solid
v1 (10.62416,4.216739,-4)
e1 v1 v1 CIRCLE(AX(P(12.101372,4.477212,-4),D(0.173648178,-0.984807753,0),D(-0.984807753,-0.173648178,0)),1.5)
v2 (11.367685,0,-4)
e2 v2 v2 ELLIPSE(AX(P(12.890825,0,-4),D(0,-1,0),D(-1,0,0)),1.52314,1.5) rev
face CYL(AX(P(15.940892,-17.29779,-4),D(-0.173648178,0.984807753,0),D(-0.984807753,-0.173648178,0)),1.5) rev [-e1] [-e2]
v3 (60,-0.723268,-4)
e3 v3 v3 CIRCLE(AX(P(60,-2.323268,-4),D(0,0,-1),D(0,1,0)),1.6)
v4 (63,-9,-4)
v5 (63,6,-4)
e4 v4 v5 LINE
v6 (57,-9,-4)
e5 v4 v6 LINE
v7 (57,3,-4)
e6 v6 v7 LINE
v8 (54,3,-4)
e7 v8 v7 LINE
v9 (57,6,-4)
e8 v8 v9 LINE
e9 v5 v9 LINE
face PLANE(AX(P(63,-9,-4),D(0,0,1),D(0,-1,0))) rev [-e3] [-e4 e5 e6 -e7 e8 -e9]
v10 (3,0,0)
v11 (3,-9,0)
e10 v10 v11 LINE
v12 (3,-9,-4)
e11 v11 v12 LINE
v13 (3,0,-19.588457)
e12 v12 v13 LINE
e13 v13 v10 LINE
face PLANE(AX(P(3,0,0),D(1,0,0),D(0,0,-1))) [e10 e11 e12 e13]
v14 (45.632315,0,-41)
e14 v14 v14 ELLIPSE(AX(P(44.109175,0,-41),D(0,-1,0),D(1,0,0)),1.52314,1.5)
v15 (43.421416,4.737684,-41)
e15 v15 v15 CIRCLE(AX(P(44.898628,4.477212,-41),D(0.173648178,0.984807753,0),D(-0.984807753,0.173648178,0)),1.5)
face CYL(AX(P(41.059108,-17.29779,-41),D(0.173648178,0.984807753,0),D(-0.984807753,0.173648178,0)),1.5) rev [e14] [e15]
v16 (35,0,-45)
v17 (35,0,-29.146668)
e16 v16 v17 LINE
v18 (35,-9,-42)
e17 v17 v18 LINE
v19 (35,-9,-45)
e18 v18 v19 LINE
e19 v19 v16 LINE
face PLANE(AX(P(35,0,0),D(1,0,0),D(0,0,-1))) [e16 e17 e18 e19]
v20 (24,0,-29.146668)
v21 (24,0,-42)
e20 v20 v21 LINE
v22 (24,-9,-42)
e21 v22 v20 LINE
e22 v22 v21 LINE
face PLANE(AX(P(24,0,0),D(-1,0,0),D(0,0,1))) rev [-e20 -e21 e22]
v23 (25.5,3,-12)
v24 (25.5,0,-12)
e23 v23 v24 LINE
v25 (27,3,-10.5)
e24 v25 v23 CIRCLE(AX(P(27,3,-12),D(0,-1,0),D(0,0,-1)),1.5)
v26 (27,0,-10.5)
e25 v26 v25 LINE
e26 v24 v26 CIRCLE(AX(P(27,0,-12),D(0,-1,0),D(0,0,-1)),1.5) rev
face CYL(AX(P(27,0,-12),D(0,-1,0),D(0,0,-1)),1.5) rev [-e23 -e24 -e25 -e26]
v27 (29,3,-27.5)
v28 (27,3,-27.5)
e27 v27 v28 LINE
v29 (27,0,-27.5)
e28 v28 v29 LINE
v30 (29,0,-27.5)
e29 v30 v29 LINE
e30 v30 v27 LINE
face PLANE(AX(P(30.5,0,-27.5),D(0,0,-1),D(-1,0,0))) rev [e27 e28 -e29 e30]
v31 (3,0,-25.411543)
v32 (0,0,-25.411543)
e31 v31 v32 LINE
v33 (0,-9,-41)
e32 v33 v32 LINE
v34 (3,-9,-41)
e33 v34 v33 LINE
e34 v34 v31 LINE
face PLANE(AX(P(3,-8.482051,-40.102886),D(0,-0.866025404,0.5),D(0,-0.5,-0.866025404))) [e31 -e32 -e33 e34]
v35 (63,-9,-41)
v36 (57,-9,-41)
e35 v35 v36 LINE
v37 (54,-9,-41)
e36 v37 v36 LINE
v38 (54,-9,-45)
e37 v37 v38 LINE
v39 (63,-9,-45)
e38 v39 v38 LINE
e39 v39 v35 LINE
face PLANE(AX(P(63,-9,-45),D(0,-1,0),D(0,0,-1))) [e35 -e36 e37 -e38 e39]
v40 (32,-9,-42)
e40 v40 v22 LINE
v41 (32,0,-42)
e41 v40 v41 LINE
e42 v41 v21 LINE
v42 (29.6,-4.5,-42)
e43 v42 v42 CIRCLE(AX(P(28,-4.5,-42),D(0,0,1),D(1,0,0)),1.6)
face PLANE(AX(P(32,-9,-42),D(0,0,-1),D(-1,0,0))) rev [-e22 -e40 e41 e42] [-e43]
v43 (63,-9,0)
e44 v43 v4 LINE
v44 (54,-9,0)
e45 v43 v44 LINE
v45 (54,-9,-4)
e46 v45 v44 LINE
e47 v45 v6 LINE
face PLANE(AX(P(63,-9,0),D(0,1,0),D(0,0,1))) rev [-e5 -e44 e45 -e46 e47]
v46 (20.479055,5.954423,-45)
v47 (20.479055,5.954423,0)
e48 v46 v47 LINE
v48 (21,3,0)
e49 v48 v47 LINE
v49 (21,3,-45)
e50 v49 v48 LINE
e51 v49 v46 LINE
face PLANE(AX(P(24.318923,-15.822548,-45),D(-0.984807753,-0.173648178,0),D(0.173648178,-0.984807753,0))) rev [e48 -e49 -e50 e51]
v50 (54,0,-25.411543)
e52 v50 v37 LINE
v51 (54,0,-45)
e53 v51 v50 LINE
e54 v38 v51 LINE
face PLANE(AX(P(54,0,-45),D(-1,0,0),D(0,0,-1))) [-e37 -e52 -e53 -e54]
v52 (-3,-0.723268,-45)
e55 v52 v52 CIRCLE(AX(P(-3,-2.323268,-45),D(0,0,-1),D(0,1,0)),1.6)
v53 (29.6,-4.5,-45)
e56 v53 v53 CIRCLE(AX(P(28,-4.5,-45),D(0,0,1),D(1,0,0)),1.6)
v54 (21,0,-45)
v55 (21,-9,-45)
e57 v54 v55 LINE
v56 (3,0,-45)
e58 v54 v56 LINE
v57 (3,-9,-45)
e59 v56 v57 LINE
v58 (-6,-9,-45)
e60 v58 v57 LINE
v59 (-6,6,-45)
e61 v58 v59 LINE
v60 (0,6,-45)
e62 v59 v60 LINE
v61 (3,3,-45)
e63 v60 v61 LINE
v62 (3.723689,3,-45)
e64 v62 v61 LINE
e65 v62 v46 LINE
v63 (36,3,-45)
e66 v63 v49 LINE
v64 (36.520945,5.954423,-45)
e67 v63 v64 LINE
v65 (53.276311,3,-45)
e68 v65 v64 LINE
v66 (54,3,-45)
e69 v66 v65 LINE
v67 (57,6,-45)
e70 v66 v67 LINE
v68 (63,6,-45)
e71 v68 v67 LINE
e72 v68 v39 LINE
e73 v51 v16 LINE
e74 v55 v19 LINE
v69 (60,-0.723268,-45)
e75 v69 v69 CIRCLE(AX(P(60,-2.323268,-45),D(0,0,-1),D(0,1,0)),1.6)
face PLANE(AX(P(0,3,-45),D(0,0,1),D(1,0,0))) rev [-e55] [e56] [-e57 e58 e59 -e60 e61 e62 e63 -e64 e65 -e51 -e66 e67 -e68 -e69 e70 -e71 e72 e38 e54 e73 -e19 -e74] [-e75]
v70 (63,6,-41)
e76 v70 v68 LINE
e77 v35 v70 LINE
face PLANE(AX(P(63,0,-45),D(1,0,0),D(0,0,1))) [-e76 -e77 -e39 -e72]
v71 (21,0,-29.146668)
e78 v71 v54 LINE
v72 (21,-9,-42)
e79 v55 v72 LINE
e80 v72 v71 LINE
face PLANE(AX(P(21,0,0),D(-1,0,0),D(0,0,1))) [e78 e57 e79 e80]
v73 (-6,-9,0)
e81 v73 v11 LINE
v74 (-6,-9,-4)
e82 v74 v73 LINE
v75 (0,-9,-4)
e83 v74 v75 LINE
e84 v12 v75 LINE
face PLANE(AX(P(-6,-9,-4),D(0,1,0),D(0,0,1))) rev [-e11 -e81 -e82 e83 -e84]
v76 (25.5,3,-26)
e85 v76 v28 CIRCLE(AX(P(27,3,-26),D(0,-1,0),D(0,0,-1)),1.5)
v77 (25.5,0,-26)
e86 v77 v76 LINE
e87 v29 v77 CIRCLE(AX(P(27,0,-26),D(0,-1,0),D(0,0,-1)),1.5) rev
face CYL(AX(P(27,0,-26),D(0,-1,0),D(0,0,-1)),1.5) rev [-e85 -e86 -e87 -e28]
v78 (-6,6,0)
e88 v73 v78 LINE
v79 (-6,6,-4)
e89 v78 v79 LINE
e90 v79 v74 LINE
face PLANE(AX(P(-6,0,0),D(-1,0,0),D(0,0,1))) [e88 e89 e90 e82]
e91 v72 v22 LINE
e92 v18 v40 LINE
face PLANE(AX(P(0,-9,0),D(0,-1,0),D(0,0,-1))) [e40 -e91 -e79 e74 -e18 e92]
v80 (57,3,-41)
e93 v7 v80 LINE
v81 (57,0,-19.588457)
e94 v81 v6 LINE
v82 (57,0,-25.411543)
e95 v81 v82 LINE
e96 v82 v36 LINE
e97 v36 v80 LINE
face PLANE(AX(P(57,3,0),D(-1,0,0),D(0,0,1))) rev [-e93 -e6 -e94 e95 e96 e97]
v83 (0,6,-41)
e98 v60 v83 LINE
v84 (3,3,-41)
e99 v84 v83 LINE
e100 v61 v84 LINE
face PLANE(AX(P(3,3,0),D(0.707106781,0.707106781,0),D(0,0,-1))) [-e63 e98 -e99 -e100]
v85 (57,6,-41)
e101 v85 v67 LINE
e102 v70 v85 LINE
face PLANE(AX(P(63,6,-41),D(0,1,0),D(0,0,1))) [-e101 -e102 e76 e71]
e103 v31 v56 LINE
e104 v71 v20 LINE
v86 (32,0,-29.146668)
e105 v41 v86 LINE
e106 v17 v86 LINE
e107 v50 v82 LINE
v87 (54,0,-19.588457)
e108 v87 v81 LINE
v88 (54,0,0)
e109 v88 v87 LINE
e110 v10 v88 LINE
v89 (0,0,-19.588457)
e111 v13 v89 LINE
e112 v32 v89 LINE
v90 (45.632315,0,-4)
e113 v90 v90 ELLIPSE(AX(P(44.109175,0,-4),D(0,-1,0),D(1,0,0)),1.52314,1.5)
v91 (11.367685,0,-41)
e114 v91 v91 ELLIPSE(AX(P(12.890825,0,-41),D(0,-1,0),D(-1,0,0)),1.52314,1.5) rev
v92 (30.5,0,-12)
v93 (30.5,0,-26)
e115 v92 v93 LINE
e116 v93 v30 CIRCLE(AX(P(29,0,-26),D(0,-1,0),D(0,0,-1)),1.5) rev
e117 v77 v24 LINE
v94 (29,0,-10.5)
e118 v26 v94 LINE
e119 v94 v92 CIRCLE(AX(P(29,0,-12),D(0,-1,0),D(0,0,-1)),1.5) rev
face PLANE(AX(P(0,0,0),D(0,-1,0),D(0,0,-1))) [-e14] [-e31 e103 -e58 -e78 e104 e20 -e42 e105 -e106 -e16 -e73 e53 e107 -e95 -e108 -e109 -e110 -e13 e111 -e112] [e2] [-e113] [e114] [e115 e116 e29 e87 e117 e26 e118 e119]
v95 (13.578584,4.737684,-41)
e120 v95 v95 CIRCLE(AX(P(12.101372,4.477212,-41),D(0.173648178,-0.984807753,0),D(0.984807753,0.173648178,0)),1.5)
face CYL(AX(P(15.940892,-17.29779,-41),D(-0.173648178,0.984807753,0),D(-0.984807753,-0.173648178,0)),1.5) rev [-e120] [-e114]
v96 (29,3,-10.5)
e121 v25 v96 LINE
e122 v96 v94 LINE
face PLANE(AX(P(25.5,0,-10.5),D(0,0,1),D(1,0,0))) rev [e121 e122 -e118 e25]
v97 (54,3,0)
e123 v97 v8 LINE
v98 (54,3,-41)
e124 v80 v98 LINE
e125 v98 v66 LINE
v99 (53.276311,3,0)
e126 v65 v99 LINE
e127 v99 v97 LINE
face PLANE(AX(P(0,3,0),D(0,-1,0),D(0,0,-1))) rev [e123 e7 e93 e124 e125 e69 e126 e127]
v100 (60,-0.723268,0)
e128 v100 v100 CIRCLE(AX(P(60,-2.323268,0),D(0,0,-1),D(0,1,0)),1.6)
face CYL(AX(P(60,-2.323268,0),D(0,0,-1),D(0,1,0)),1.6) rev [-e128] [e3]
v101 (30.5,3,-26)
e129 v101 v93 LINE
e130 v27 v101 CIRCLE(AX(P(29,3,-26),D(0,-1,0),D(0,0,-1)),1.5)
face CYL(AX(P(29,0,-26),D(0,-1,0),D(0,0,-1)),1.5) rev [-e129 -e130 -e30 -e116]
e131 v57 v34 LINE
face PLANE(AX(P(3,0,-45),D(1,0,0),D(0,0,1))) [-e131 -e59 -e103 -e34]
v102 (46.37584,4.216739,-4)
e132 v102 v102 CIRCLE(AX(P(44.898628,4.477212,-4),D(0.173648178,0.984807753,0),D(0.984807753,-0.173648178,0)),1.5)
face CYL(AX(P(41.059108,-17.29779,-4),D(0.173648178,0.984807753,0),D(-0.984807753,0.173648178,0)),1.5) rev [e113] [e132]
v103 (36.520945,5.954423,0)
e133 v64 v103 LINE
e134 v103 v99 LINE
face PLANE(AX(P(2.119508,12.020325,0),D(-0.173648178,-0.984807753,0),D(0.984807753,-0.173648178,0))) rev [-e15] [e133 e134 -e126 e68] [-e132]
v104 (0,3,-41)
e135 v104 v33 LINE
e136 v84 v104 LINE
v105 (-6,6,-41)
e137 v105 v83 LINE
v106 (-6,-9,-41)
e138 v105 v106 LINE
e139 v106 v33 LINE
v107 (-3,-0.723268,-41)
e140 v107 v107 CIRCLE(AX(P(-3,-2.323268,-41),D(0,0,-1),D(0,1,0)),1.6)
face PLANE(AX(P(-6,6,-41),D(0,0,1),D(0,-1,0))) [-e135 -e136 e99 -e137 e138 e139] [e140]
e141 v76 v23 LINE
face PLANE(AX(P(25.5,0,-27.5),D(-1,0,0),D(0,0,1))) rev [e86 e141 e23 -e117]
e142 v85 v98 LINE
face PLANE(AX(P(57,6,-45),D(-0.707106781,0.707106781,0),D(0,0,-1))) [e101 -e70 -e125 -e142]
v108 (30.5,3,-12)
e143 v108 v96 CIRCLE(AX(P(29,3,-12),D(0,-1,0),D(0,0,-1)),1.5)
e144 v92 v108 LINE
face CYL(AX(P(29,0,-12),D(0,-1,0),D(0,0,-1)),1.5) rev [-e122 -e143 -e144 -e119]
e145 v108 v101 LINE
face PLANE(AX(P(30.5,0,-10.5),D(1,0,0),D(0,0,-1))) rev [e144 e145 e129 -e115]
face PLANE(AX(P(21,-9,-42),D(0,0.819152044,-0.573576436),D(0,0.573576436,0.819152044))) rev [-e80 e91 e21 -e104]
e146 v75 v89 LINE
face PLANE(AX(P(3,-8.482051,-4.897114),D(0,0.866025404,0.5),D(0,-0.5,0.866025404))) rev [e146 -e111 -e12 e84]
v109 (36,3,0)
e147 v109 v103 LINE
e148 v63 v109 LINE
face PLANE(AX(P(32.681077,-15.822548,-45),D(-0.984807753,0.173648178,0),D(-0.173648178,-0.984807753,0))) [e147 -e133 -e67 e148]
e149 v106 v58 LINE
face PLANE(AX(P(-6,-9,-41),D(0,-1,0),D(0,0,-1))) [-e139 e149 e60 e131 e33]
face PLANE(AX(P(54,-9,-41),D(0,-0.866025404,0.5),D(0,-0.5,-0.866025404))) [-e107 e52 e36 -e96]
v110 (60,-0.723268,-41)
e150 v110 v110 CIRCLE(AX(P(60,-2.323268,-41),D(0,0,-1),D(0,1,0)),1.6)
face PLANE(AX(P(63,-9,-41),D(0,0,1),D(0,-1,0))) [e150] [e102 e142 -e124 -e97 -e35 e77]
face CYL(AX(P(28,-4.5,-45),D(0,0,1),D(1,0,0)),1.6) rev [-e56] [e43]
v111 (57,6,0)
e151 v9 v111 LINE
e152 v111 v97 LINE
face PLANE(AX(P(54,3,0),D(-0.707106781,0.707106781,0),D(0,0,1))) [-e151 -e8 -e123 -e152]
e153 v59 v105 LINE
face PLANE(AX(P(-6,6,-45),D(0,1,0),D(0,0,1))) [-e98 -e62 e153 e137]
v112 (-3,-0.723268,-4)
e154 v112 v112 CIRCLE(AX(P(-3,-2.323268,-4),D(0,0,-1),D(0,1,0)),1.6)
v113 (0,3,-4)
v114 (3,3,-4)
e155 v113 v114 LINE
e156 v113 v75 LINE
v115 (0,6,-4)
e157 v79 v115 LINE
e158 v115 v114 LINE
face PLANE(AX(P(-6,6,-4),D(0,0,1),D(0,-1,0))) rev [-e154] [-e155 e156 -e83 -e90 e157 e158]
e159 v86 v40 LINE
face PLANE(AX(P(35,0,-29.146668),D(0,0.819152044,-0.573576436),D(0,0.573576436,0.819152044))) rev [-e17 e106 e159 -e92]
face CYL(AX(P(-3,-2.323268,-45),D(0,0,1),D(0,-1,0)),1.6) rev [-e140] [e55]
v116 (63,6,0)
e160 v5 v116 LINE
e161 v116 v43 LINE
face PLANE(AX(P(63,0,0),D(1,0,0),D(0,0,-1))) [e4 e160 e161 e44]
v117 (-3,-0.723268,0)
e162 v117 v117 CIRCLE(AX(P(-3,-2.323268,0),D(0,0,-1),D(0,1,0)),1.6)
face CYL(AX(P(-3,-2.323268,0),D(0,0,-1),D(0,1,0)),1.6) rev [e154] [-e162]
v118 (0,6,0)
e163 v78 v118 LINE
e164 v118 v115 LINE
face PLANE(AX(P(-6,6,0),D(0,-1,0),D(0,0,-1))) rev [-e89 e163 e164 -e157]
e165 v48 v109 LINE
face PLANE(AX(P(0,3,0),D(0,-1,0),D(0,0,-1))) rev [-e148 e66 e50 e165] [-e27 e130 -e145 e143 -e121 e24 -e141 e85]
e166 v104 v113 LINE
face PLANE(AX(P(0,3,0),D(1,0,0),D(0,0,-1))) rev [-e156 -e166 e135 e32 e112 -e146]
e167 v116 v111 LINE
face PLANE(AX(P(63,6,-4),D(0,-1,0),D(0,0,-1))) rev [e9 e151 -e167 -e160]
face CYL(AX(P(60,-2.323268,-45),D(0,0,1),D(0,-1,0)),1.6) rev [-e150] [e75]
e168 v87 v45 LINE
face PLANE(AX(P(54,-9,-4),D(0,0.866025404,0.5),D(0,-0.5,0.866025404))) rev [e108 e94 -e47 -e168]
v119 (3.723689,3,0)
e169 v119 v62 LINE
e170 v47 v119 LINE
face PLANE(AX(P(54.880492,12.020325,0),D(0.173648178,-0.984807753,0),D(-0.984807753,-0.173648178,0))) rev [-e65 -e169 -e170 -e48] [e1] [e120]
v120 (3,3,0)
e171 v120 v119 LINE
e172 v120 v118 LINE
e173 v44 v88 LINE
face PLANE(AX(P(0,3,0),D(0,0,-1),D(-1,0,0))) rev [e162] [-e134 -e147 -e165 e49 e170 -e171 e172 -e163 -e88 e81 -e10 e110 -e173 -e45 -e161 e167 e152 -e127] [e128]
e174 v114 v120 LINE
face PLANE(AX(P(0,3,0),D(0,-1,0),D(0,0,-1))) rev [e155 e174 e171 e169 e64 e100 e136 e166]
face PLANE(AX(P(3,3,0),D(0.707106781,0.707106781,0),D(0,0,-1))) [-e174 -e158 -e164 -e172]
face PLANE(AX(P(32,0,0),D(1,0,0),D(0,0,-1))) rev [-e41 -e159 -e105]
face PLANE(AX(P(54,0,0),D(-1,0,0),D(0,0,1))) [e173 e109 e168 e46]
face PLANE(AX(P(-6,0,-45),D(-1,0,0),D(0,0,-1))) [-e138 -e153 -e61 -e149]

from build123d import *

# Parameters (mm, degrees)
SKETCH_1_W                 = 57
SKETCH_1_H                 = 45
EXTRUDE_1_DEPTH            = 3
SKETCH_2_W                 = 4
SKETCH_2_H                 = 15
EXTRUDE_2_DEPTH            = 6
SKETCH_3_W                 = 4
SKETCH_3_H                 = 15
EXTRUDE_3_DEPTH            = 6
EXTRUDE_4_DEPTH            = 3
SKETCH_5_W                 = 4
SKETCH_5_H                 = 9
EXTRUDE_5_DEPTH            = 3
CHAMFER_1_SIZE             = 3
SKETCH_6_R                 = 1.6
CUT_EXTRUDE_1_DEPTH        = 4
SKETCH_8_W                 = 8
SKETCH_8_H                 = 3
EXTRUDE_6_DEPTH            = 9
EXTRUDE_7_DEPTH            = 3
EXTRUDE_8_DEPTH            = 3
SKETCH_11_R                = 1.6
CUT_EXTRUDE_3_DEPTH        = 3
SKETCH_12_W                = 5
SKETCH_12_H                = 17
CUT_EXTRUDE_4_DEPTH        = 3
FILLET_1_R                 = 1.5
EXTRUDE_9_REACH            = 80.57
SKETCH_15_W                = 45
SKETCH_15_H                = 17.726539555
SKETCH_16_R                = 1.5
CUT_EXTRUDE_5_DEPTH        = 79.570276896
CHAMFER_1_OF_MIRROR_2_SIZE = 3


with BuildPart() as part:
    # 草图1 → 凸台-拉伸1 (new body)
    with BuildSketch(Plane(origin=(0, 0, 0), x_dir=(1, 0, 0), z_dir=(0, 1, 0))):
        with Locations((28.5, 22.5)):
            Rectangle(SKETCH_1_W, SKETCH_1_H)
    extrude(amount=EXTRUDE_1_DEPTH)

    # 草图2 → 凸台-拉伸2 (add)
    with BuildSketch(Plane.ZY):
        with Locations((-2, -1.5)):
            Rectangle(SKETCH_2_W, SKETCH_2_H)
    extrude_2 = extrude(amount=EXTRUDE_2_DEPTH)

    # 草图3 → 凸台-拉伸3 (add)
    with BuildSketch(Plane(origin=(57, 0, 0), x_dir=(0, 0, -1), z_dir=(1, 0, 0))):
        with Locations((2, -1.5)):
            Rectangle(SKETCH_3_W, SKETCH_3_H)
    extrude_3 = extrude(amount=EXTRUDE_3_DEPTH)

    # 草图4 → 凸台-拉伸4 (add)
    with BuildSketch(Plane.ZY.offset(-57)):
        Polygon((-4, -9), (-19.588457268, 0), (0, 0), (0, -9), align=None)
    extrude_4 = extrude(amount=EXTRUDE_4_DEPTH)

    # 草图5 → 凸台-拉伸5 (add)
    with BuildSketch(Plane(origin=(0, 0, 0), x_dir=(0, 0, -1), z_dir=(1, 0, 0))):
        Polygon((19.588457268, 0), (4, 0), (4, -9), align=None)
        with Locations((2, -4.5)):
            Rectangle(SKETCH_5_W, SKETCH_5_H)
    extrude_5 = extrude(amount=EXTRUDE_5_DEPTH)

    # 倒角1
    chamfer_1_edges = [part.edges().sort_by_distance(p)[0] for p in [
        (0, 3, -2),
        (57, 3, -2),
    ]]
    chamfer(chamfer_1_edges, length=CHAMFER_1_SIZE - 0.0001)  # a hair under: the kernel refuses the full size

    # 草图6 → 切除-拉伸1 (cut)
    with BuildSketch(Plane(origin=(0, 0, -4), x_dir=(-1, 0, 0), z_dir=(0, 0, -1))):
        with Locations(Location((3, -2.323268139, 0), (0, 0, 90))):
            Circle(SKETCH_6_R)
        with Locations(Location((-60, -2.323268139, 0), (0, 0, 90))):
            Circle(SKETCH_6_R)
    cut_extrude_1 = extrude(amount=-CUT_EXTRUDE_1_DEPTH, mode=Mode.SUBTRACT)

    # 草图8 → 凸台-拉伸6 (add)
    with BuildSketch(Plane.XZ):
        with Locations((28, -43.5)):
            Rectangle(SKETCH_8_W, SKETCH_8_H)
    extrude(amount=EXTRUDE_6_DEPTH)

    # 草图9 → 凸台-拉伸7 (add)
    with BuildSketch(Plane(origin=(32, 0, 0), x_dir=(0, 0, -1), z_dir=(1, 0, 0))):
        Polygon((45, 0), (29.146667939, 0), (42, -9), (45, -9), align=None)
    extrude(amount=EXTRUDE_7_DEPTH)

    # 草图10 → 凸台-拉伸8 (add)
    with BuildSketch(Plane.ZY.offset(-24)):
        Polygon((-45, 0), (-45, -9), (-42, -9), (-29.146667939, 0), align=None)
    extrude(amount=EXTRUDE_8_DEPTH)

    # 草图11 → 切除-拉伸3 (cut)
    with BuildSketch(Plane.XY.offset(-42)):
        with Locations((28, -4.5)):
            Circle(SKETCH_11_R)
    extrude(amount=-CUT_EXTRUDE_3_DEPTH, mode=Mode.SUBTRACT)

    # 草图12 → 切除-拉伸4 (cut)
    with BuildSketch(Plane(origin=(0, 3, 0), x_dir=(1, 0, 0), z_dir=(0, 1, 0))):
        with Locations((28, 19)):
            Rectangle(SKETCH_12_W, SKETCH_12_H)
    extrude(amount=-CUT_EXTRUDE_4_DEPTH, mode=Mode.SUBTRACT)

    # 圆角1
    fillet_1_edges = [part.edges().sort_by_distance(p)[0] for p in [
        (25.5, 1.5, -27.5),
        (30.5, 1.5, -27.5),
        (30.5, 1.5, -10.5),
        (25.5, 1.5, -10.5),
    ]]
    fillet(fillet_1_edges, radius=FILLET_1_R)

    # 草图15 → 凸台-拉伸9 (add, up to next)
    with BuildSketch(Plane(origin=(2.119507574, 12.02032477, 0), x_dir=(0, 0, 1), z_dir=(0.17364817766693066, 0.9848077530122081, 0)), mode=Mode.PRIVATE) as extrude_9_sk1:
        with Locations((-22.5, 43.795404353)):
            Rectangle(SKETCH_15_W, SKETCH_15_H)
    extrude_9_tool1 = extrude(extrude_9_sk1.sketch, amount=-EXTRUDE_9_REACH, mode=Mode.PRIVATE) - part.part
    extrude_9 = extrude_9_tool1.solids().sort_by_distance((45.249561, 4.415333, -22.5))[0]
    add(extrude_9)

    # 草图16 → 切除-拉伸5 (cut, through all)
    with BuildSketch(Plane(origin=(2.119507574, 12.02032477, 0), x_dir=(0.9848077530122081, -0.17364817766693064, 0), z_dir=(0.17364817766693064, 0.9848077530122081, 0))):
        with Locations(Location((43.439057305, 41, 0), (0, 0, 180))):
            Circle(SKETCH_16_R)
        with Locations((43.439057305, 4)):
            Circle(SKETCH_16_R)
    cut_extrude_5 = extrude(amount=-CUT_EXTRUDE_5_DEPTH, mode=Mode.SUBTRACT)

    # 镜向1: 凸台-拉伸9, 切除-拉伸5 across plane
    add(extrude_9.mirror(Plane(origin=(28.5, 0, 0), x_dir=(0, 0, 1), z_dir=(1, 0, 0))))
    add(cut_extrude_5.mirror(Plane(origin=(28.5, 0, 0), x_dir=(0, 0, 1), z_dir=(1, 0, 0))), mode=Mode.SUBTRACT)

    # 镜向2: 凸台-拉伸2, 凸台-拉伸3, 凸台-拉伸4, 凸台-拉伸5, 切除-拉伸1 across plane
    add(extrude_2.mirror(Plane.XY.offset(-22.5)))
    add(extrude_3.mirror(Plane.XY.offset(-22.5)))
    add(extrude_4.mirror(Plane.XY.offset(-22.5)))
    add(extrude_5.mirror(Plane.XY.offset(-22.5)))
    add(cut_extrude_1.mirror(Plane.XY.offset(-22.5)), mode=Mode.SUBTRACT)

    # 倒角1 of 镜向2
    chamfer_1_of_mirror_2_edges = [part.edges().sort_by_distance(p)[0] for p in [
        (0, 3, -43),
        (57, 3, -43),
    ]]
    chamfer(chamfer_1_of_mirror_2_edges, length=CHAMFER_1_OF_MIRROR_2_SIZE - 0.0001)  # a hair under: the kernel refuses the full size


solid = part.part
